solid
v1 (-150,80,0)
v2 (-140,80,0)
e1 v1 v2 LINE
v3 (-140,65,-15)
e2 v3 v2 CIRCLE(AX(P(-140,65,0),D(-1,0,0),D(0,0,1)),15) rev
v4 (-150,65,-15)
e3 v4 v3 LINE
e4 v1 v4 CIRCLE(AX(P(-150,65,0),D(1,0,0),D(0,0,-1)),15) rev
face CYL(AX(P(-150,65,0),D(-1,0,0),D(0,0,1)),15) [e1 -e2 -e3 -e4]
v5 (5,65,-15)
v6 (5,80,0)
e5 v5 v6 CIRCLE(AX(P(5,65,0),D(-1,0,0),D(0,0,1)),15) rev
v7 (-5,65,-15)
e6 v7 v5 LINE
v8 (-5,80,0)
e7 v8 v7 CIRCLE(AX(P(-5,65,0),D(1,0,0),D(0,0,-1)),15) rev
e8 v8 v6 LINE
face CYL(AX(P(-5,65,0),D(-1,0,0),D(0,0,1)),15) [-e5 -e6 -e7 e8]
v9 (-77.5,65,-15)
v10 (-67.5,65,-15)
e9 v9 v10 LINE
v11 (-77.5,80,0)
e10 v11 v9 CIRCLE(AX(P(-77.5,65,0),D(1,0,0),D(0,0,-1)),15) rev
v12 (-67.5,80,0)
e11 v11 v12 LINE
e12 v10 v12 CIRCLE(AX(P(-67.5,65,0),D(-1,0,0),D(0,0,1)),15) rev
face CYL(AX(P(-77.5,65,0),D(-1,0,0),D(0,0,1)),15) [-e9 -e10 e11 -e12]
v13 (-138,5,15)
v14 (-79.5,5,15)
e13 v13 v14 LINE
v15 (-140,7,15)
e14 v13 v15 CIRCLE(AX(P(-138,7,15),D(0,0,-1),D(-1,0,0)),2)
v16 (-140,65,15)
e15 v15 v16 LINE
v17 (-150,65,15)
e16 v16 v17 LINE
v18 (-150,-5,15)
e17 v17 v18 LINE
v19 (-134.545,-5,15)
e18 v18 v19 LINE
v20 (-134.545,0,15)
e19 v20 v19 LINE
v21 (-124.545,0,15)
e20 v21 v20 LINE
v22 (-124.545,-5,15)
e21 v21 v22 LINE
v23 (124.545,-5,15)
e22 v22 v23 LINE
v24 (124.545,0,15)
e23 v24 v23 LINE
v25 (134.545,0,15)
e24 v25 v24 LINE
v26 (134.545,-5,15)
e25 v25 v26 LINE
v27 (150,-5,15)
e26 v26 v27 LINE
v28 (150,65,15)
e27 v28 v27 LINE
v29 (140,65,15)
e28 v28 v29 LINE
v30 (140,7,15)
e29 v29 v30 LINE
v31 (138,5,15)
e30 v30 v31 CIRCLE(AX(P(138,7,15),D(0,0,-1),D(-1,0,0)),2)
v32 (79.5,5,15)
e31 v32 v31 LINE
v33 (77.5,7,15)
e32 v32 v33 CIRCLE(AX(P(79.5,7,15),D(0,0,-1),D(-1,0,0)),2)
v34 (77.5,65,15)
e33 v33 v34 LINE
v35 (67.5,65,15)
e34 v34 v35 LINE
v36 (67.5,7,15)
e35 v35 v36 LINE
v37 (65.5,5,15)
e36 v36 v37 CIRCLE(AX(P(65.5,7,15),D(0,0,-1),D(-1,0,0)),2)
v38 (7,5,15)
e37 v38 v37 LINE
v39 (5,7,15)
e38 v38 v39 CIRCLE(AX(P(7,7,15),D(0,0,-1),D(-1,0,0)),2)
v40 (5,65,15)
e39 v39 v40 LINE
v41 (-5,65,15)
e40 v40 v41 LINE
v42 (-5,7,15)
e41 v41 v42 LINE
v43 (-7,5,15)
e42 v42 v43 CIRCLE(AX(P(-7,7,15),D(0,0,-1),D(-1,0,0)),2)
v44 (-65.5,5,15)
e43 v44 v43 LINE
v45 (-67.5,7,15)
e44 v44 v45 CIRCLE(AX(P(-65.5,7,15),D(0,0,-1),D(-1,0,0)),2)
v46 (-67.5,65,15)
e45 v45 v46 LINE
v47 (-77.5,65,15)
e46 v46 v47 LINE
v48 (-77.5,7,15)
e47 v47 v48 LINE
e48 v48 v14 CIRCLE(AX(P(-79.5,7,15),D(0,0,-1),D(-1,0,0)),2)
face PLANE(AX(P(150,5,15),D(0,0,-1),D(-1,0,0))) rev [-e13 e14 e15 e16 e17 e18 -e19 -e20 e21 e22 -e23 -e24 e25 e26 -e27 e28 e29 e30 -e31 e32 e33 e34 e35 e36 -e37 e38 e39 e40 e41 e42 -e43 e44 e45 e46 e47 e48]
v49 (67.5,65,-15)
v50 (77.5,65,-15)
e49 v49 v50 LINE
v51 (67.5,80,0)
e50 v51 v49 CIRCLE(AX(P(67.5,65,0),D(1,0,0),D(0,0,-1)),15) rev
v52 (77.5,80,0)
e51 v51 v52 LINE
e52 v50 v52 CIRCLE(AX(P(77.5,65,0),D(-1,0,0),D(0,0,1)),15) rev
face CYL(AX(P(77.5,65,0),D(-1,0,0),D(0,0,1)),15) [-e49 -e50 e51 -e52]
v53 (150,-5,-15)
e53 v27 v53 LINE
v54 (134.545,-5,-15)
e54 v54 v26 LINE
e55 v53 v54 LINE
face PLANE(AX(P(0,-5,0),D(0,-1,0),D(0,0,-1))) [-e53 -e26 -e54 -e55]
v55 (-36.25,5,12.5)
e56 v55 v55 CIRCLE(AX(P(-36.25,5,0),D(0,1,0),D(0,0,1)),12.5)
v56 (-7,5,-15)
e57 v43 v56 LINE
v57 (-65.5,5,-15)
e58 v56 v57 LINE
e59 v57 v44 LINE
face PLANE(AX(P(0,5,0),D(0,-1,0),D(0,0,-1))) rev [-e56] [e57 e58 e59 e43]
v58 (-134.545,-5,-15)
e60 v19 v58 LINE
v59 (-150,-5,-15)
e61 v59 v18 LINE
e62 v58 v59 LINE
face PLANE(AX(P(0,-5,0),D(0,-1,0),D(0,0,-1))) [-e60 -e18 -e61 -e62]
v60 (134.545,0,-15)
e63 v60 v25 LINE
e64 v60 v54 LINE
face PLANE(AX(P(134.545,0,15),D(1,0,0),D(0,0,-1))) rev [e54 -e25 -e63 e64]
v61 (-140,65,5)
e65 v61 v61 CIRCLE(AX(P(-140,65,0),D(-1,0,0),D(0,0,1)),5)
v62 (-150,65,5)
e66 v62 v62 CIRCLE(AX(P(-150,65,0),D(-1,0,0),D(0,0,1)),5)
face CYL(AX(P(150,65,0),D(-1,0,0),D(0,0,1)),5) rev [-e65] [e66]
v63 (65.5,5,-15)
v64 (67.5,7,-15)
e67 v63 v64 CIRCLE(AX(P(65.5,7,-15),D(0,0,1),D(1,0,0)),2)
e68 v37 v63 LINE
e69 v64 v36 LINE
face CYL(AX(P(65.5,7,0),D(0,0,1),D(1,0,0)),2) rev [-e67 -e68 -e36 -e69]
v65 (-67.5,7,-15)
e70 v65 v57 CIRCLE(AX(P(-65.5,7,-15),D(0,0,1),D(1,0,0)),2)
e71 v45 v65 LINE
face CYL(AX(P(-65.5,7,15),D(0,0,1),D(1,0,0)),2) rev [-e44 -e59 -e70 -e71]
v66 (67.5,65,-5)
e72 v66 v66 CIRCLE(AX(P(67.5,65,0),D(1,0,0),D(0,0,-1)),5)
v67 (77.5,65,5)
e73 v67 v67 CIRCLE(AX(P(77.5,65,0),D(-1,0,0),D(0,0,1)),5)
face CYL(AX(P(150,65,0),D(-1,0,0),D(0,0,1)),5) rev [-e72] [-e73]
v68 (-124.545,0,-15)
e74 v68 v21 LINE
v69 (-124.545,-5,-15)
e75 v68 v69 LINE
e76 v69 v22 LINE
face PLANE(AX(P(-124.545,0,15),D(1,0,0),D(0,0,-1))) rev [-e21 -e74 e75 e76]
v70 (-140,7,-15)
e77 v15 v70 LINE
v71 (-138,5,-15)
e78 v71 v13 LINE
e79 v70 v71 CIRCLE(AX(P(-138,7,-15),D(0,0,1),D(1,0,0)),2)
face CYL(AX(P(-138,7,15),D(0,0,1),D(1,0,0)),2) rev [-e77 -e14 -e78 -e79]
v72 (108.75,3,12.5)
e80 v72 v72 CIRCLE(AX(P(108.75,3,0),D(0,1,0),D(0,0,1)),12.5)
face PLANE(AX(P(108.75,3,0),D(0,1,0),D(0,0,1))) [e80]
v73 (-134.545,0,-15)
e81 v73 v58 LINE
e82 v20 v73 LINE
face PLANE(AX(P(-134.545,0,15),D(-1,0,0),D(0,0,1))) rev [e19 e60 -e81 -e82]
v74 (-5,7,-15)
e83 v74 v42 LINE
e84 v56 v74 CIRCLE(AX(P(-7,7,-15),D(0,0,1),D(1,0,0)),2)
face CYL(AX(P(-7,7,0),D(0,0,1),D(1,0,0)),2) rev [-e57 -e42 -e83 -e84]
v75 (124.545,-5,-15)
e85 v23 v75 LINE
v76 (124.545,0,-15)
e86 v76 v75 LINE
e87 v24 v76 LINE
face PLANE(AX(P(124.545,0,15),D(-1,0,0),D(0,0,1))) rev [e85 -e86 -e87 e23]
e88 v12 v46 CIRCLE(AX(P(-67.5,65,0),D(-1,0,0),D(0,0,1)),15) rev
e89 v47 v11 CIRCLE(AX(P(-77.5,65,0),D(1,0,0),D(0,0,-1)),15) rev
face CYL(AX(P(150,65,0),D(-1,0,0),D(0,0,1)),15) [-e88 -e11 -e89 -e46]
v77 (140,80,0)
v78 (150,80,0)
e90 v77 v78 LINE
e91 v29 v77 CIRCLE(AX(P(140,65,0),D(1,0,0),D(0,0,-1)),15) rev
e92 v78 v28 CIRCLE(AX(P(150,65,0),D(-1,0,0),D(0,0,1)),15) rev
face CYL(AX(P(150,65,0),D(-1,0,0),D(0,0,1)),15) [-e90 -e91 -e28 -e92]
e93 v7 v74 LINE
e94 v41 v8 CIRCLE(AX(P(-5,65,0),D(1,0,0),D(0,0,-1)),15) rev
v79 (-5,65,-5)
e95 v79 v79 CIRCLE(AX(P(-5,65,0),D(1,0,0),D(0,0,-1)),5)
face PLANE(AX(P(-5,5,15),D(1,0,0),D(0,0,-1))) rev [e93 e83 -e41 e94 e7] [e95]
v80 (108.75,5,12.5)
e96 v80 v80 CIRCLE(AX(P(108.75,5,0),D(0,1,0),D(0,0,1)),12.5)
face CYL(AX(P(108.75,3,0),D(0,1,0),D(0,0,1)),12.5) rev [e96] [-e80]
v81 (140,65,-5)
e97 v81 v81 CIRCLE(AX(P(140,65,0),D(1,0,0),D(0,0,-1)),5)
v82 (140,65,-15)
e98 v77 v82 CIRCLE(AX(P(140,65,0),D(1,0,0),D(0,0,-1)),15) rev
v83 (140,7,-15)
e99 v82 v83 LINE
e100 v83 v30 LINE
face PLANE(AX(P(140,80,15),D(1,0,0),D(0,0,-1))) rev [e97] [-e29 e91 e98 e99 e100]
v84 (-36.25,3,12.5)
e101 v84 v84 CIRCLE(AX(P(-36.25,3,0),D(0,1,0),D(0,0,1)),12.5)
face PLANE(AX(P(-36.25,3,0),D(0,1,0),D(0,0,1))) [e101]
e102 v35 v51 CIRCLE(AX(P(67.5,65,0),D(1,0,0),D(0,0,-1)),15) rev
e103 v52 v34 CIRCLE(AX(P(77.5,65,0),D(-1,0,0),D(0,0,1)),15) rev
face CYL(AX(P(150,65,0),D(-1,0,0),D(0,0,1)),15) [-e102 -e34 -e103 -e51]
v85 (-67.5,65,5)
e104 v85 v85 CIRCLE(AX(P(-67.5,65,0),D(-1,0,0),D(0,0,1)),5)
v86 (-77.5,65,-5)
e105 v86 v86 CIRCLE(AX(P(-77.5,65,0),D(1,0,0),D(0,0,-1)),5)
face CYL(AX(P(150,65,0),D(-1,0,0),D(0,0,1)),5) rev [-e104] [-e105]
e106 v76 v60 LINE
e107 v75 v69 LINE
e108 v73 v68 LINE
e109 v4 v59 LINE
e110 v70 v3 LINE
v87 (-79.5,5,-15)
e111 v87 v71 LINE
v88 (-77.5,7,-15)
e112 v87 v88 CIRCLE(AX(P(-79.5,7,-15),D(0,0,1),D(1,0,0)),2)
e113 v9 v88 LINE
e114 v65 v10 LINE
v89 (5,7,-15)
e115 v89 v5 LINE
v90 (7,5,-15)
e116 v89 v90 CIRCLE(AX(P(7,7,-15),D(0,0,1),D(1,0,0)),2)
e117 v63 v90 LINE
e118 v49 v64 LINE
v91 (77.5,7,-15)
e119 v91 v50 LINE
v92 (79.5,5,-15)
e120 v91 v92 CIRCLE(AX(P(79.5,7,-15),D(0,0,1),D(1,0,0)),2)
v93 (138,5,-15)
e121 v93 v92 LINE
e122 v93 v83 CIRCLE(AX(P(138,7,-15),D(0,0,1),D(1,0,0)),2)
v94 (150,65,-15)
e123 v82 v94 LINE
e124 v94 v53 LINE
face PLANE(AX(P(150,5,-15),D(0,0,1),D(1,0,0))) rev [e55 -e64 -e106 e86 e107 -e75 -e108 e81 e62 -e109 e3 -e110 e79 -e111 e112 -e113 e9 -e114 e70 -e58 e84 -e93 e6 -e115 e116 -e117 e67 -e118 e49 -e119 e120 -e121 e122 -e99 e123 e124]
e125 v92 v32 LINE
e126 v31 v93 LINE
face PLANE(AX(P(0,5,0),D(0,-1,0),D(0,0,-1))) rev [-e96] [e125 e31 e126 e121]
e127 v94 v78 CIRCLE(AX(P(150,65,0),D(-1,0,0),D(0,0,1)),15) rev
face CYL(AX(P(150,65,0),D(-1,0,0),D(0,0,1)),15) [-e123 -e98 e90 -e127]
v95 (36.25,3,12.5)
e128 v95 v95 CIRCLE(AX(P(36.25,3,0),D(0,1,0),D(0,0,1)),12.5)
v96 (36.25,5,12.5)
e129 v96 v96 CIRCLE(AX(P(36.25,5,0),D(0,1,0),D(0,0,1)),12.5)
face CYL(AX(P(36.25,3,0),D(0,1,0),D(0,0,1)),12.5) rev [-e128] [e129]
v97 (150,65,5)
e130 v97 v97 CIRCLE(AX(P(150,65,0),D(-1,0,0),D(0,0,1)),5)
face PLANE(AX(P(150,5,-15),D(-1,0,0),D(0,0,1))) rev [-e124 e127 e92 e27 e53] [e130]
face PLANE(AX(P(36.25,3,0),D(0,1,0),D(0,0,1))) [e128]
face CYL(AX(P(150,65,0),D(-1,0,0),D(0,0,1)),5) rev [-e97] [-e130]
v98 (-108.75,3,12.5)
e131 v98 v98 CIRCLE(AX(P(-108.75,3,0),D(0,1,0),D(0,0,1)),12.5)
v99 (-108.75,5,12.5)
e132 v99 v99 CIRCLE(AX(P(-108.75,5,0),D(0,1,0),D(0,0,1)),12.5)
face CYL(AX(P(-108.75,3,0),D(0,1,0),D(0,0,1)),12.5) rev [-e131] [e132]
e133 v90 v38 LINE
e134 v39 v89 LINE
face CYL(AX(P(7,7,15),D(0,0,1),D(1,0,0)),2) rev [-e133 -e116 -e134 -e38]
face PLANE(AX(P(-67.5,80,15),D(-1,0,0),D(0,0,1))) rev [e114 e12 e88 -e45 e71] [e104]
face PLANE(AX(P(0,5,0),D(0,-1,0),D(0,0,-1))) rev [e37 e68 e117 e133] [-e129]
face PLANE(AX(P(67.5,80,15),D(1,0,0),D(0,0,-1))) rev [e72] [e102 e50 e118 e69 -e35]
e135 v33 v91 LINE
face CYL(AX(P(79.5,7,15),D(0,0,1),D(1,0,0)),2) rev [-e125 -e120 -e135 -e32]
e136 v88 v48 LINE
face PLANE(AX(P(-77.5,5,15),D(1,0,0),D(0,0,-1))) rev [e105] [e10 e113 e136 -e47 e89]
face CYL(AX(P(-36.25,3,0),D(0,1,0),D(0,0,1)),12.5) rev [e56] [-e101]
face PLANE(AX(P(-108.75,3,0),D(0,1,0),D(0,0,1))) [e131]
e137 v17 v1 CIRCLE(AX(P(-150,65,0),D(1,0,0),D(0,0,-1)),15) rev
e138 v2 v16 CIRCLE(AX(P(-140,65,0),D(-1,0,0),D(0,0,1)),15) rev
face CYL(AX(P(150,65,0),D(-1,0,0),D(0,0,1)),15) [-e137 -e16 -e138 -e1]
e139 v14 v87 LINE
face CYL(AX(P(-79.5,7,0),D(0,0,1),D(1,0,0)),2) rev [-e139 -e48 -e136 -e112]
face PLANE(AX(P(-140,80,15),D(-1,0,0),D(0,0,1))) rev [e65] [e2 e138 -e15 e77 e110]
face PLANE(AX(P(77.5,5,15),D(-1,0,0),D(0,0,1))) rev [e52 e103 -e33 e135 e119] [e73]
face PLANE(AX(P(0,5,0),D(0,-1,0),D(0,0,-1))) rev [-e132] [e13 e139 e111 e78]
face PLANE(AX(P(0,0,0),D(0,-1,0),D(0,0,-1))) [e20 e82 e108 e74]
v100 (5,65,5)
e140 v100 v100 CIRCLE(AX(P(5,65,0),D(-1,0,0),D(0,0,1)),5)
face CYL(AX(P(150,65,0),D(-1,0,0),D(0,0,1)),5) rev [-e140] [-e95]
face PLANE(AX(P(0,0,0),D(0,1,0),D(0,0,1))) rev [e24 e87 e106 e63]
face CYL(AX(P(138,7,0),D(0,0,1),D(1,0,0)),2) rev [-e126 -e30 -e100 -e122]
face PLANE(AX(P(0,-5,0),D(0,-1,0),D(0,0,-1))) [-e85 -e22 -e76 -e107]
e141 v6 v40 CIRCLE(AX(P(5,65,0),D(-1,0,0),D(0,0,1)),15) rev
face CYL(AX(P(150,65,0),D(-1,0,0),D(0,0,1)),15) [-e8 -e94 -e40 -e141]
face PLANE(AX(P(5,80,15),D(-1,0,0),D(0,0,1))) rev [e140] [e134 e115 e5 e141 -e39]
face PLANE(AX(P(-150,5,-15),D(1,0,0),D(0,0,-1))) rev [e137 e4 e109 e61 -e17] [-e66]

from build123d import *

# Parameters (mm, degrees)
SKETCH1_W            = 300
SKETCH1_H            = 30
BOSS_EXTRUDE1_DEPTH  = 5
SKETCH2_W            = 10
SKETCH2_H            = 30
CUT_EXTRUDE1_DEPTH   = 5
SKETCH3_W            = 10
SKETCH3_H            = 75
BOSS_EXTRUDE2_DEPTH  = 15
FILLET1_R            = 15
SKETCH4_R            = 5
CUT_EXTRUDE2_DEPTH   = 311.845620847
FILLET2_R            = 15
FILLET3_R            = 2
SKETCH5_R            = 12.5
CUT_EXTRUDE3_DEPTH   = 2
LPATTERN1_COUNT      = 3
LPATTERN1_PITCH      = 72.5
LPATTERN1_COUNT_DIR2 = 3
LPATTERN1_PITCH_DIR2 = 72.5


with BuildPart() as part:
    # Sketch1 → Boss-Extrude1 (new, symmetric)
    with BuildSketch(Plane(origin=(0, 0, 0), x_dir=(1, 0, 0), z_dir=(0, 1, 0))):
        Rectangle(SKETCH1_W, SKETCH1_H)
    extrude(amount=BOSS_EXTRUDE1_DEPTH, both=True)

    # Sketch2 → Cut-Extrude1 (cut)
    with BuildSketch(Plane.XZ.offset(5)):
        with Locations((-129.545, 0)):
            Rectangle(SKETCH2_W, SKETCH2_H)
        with Locations((129.545, 0)):
            Rectangle(SKETCH2_W, SKETCH2_H)
    extrude(amount=-CUT_EXTRUDE1_DEPTH, mode=Mode.SUBTRACT)

    # Sketch3 → Boss-Extrude2 (add, symmetric)
    with BuildSketch(Plane.XY):
        with Locations((-145, 42.5)):
            Rectangle(SKETCH3_W, SKETCH3_H)
        with Locations((145, 42.5)):
            Rectangle(SKETCH3_W, SKETCH3_H)
        with Locations((-72.5, 42.5)):
            Rectangle(SKETCH3_W, SKETCH3_H)
        with Locations((72.5, 42.5)):
            Rectangle(SKETCH3_W, SKETCH3_H)
        with Locations((0, 42.5)):
            Rectangle(SKETCH3_W, SKETCH3_H)
    extrude(amount=BOSS_EXTRUDE2_DEPTH, both=True)

    # Fillet1
    fillet1_edges = [part.edges().sort_by_distance(p)[0] for p in [
        (145, 80, -15),
        (145, 80, 15),
        (-145, 80, -15),
        (-145, 80, 15),
    ]]
    fillet(fillet1_edges, radius=FILLET1_R - 0.0001)  # a hair under: the kernel refuses the full size

    # Sketch4 → Cut-Extrude2 (cut, through all)
    with BuildSketch(Plane.ZY.offset(150)):
        with Locations((0, 65)):
            Circle(SKETCH4_R)
    extrude(amount=-CUT_EXTRUDE2_DEPTH, mode=Mode.SUBTRACT)

    # Fillet2
    fillet2_edges = [part.edges().sort_by_distance(p)[0] for p in [
        (72.5, 80, -15),
        (72.5, 80, 15),
        (0, 80, -15),
        (0, 80, 15),
        (-72.5, 80, -15),
        (-72.5, 80, 15),
    ]]
    fillet(fillet2_edges, radius=FILLET2_R - 0.0001)  # a hair under: the kernel refuses the full size

    # Fillet3
    fillet3_edges = [part.edges().sort_by_distance(p)[0] for p in [
        (-140, 5, 0),
        (140, 5, 0),
        (-77.5, 5, 0),
        (-67.5, 5, 0),
        (67.5, 5, 0),
        (77.5, 5, 0),
        (-5, 5, 0),
        (5, 5, 0),
    ]]
    fillet(fillet3_edges, radius=FILLET3_R)

    # Sketch5 → Cut-Extrude3 (cut)
    with BuildSketch(Plane(origin=(0, 5, 0), x_dir=(1, 0, 0), z_dir=(0, 1, 0))):
        with Locations(Location((36.25, 0, 0), (0, 0, 270))):
            Circle(SKETCH5_R)
    cut_extrude3 = extrude(amount=-CUT_EXTRUDE3_DEPTH, mode=Mode.SUBTRACT)

    # LPattern1: Cut-Extrude3 3 × 3
    with Locations(*[Vector(-1, 0, 0) * (i * LPATTERN1_PITCH) + Vector(1, 0, 0) * (j * LPATTERN1_PITCH_DIR2) for i in range(LPATTERN1_COUNT) for j in range(LPATTERN1_COUNT_DIR2) if (i, j) != (0, 0)]):
        add(cut_extrude3, mode=Mode.SUBTRACT)


solid = part.part
